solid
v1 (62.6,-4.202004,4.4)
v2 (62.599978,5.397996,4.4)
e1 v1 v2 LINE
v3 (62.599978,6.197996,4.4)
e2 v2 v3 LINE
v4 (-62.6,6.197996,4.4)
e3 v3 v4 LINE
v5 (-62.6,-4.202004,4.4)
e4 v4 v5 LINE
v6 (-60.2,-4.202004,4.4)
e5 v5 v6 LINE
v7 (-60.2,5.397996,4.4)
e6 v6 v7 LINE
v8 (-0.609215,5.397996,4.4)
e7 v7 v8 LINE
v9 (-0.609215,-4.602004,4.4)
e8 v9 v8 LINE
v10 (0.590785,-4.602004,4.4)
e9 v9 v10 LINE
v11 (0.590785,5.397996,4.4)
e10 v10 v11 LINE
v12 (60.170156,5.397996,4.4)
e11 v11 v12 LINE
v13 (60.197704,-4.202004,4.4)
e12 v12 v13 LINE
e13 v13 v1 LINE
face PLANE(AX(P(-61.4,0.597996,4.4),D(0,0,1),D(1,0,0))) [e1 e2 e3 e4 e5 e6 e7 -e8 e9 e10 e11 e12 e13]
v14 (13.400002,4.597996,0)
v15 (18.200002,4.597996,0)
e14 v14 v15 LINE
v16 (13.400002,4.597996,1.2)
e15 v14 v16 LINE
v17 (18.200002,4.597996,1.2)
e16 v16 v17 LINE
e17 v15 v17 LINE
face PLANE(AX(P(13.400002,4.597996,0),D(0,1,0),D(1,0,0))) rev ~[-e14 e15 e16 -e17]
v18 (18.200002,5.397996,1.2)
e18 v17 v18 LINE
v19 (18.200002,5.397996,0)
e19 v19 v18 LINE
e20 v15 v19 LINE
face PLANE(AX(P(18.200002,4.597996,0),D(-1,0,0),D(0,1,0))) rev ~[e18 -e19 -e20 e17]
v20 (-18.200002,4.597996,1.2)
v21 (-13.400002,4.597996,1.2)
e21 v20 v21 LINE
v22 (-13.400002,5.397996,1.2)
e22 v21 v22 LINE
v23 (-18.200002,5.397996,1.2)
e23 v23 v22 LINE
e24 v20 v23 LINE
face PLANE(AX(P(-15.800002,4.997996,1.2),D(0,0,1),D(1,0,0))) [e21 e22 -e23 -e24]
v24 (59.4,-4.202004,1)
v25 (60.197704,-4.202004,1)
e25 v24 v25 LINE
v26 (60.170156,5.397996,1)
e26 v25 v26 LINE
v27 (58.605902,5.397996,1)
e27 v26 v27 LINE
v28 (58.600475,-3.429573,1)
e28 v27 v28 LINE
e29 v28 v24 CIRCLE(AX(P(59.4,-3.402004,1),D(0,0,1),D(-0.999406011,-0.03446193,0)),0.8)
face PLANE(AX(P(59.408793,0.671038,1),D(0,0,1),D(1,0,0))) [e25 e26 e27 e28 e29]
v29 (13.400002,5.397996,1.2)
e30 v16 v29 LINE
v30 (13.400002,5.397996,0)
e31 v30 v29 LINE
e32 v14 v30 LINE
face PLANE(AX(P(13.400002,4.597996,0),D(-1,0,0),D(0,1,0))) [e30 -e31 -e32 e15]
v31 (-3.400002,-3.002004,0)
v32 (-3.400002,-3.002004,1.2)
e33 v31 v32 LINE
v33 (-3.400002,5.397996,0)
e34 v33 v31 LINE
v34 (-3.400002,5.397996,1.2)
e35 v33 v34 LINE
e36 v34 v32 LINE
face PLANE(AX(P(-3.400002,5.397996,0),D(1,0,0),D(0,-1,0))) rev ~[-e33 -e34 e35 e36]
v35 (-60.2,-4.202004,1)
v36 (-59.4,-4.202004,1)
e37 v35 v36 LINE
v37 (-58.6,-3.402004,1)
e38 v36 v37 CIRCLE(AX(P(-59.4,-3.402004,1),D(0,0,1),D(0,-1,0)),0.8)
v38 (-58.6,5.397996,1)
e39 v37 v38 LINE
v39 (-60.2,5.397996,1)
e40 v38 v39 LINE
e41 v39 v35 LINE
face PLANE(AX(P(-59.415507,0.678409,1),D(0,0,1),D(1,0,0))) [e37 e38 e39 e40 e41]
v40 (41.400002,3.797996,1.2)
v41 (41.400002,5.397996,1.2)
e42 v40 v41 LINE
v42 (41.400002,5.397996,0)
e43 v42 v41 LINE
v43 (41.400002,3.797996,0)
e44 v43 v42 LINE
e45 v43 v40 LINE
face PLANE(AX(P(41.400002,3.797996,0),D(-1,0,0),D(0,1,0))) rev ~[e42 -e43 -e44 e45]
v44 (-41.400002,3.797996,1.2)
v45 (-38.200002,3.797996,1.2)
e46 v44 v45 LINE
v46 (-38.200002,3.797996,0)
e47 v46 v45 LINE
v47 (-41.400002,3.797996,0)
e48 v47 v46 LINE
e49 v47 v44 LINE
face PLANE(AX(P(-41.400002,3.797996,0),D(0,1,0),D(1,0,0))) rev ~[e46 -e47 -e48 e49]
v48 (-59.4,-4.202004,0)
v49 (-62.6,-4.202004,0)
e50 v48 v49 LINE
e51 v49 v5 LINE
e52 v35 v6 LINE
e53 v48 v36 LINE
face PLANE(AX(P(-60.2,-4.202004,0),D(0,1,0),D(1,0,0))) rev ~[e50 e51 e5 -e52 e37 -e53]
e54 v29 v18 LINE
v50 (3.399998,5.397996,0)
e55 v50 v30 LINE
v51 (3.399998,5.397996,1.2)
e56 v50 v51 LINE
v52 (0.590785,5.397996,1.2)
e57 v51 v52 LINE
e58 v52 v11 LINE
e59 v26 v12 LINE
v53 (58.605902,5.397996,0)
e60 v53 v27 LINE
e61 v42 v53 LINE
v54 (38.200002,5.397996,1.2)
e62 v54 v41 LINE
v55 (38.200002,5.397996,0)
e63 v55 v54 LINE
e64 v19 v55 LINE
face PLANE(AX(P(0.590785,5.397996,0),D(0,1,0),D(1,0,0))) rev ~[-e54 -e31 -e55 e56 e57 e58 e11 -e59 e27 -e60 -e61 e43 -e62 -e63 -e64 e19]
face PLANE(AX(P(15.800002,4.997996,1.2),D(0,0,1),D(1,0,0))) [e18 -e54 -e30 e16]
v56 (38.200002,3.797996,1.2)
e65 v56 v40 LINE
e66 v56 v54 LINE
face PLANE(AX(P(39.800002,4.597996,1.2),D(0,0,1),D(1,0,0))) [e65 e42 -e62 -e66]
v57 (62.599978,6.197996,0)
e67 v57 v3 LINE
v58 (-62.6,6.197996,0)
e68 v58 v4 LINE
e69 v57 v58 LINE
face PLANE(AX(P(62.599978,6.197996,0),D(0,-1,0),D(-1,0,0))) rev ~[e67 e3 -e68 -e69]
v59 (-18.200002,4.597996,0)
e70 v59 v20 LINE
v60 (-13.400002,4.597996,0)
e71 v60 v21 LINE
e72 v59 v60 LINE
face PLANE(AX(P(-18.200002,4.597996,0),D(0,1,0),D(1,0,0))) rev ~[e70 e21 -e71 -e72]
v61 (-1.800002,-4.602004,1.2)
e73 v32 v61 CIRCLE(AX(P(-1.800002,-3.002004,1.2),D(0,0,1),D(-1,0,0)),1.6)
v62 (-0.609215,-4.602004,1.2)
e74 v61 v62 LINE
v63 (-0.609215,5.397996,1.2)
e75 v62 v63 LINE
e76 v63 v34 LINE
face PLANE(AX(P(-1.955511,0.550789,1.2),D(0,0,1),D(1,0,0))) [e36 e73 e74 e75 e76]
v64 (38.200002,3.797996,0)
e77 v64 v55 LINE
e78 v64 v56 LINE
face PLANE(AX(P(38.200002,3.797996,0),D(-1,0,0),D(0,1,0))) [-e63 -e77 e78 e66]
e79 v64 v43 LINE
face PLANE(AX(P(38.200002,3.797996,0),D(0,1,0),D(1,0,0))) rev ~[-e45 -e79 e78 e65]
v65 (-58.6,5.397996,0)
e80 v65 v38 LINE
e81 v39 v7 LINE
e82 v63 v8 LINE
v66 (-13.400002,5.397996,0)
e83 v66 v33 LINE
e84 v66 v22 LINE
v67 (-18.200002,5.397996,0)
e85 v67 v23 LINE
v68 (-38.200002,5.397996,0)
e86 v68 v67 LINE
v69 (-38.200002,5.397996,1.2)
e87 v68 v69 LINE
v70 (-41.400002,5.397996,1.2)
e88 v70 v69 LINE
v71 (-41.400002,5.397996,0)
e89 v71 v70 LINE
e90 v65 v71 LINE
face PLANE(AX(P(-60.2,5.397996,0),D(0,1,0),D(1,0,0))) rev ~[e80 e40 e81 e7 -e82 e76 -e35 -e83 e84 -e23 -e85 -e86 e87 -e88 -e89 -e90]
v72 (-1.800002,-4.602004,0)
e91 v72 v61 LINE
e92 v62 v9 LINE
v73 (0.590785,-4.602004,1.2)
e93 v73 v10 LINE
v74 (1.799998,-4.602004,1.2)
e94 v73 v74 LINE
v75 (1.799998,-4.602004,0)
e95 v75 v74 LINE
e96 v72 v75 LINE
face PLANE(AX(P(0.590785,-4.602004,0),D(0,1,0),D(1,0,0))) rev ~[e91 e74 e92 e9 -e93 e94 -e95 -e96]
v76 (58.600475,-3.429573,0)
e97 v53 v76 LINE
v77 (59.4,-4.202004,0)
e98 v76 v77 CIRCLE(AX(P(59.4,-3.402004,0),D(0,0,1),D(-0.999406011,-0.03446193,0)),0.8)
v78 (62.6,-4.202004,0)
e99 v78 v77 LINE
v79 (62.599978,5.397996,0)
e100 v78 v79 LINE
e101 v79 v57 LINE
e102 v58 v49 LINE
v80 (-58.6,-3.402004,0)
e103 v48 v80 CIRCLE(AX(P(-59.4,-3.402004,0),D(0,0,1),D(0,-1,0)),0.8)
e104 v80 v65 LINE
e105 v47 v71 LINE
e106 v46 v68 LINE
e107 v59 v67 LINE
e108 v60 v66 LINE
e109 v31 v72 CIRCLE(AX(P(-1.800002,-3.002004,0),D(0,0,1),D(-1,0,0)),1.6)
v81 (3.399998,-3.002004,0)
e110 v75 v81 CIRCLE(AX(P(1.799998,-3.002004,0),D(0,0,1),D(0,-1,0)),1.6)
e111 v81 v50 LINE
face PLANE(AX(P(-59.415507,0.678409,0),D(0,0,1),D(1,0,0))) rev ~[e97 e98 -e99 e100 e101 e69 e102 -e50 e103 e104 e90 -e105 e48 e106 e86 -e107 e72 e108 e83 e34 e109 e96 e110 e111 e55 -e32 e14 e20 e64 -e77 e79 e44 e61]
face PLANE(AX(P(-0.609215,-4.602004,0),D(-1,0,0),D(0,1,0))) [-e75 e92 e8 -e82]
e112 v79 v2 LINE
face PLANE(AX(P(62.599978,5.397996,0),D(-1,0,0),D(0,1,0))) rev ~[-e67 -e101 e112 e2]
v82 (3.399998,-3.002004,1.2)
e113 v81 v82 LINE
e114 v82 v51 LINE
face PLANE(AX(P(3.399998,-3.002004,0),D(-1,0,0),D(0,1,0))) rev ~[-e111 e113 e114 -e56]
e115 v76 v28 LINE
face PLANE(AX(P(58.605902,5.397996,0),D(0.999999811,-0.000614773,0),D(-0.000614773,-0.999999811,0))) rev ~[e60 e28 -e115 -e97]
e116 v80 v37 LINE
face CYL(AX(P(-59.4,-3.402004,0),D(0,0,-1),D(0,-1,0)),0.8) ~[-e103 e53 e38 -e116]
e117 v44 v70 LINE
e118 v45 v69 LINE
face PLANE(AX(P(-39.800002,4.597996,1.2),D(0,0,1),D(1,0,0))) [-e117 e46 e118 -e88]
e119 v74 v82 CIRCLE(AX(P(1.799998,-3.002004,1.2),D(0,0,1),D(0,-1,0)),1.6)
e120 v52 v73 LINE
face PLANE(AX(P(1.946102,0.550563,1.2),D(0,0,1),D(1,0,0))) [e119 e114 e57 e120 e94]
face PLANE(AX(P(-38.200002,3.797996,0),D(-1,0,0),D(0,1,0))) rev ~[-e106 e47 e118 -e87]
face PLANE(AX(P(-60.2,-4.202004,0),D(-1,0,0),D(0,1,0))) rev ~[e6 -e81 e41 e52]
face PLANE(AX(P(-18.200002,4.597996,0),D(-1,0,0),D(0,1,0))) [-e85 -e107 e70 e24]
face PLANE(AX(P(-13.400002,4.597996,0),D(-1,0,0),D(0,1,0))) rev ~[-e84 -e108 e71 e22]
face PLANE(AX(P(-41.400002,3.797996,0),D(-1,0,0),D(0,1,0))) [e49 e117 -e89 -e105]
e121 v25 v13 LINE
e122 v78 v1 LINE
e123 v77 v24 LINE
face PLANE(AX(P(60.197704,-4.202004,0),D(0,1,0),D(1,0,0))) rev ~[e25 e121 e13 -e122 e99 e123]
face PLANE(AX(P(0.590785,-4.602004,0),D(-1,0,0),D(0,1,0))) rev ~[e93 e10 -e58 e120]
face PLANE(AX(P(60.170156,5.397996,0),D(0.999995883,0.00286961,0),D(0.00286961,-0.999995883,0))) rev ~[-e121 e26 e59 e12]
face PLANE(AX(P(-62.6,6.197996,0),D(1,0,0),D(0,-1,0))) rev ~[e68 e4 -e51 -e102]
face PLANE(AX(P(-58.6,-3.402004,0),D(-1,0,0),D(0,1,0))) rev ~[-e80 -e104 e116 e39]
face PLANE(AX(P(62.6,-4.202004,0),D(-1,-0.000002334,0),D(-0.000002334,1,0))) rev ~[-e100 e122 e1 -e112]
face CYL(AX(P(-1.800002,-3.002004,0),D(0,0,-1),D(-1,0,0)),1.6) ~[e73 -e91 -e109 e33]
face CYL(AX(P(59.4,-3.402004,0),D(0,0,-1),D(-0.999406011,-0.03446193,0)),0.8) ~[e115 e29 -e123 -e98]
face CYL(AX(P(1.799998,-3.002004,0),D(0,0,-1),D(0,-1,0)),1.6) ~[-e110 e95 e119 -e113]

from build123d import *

# Parameters (mm, degrees)
F0_W     = 2.4
F0_H     = 9.6
F0_H_2   = 0.8
F0_W_2   = 1.2
F0_H_3   = 10
F0_W_3   = 1.6
F1_DEPTH = 4.4
F0_W_4   = 3.2
F0_H_4   = 1.6
F0_W_5   = 4.8
F2_DEPTH = 1.2
F3_DEPTH = 1


# Not quite as in the source:
# - ends of sketch curves that miss each other by under 0.0002 mm in the source are joined


with BuildPart() as f1:
    # F0 (on Top) → F1 (new body)
    with BuildSketch(Plane.XY):
        with Locations((-61.4, 0.5979961667)):
            Rectangle(F0_W, F0_H)
        with Locations((-61.4, 5.7979961667)):
            Rectangle(F0_W, F0_H_2)
        Polygon((-58.6, 5.3979961667), (-41.4000016928, 5.3979961667), (-38.2000016928, 5.3979961667), (-18.2000016928, 5.3979961667), (-13.4000016928, 5.3979961667), (-3.4000016928, 5.3979961667), (-0.6092149836, 5.3979961667), (0.5907850164, 5.3979961667), (3.3999983072, 5.3979961667), (13.4000016928, 5.3979961667), (18.2000016928, 5.3979961667), (38.2000016928, 5.3979961667), (41.4000016928, 5.3979961667), (58.6059018172, 5.3979961667), (58.6063936353, 6.1979961667), (-58.6, 6.1979961667), align=None)
        Polygon((62.5999775911, 6.1979961667), (60.1678602397, 6.1979961667), (60.1701559369, 5.3979961667), (62.5999775911, 5.3979961667), (62.5999775911, 5.7979961667), align=None)
        Polygon((62.5999775911, 5.3979961667), (60.1701559369, 5.3979961667), (60.1977043028, -4.2020038333), (62.6, -4.2020038333), align=None)
        with Locations((-0.0092149836, 0.3979961667)):
            Rectangle(F0_W_2, F0_H_3)
        with Locations((-59.4, 5.7979961667)):
            Rectangle(F0_W_3, F0_H_2)
        Polygon((60.1678602397, 6.1979961667), (58.6063936353, 6.1979961667), (58.6059018172, 5.3979961667), (60.1701559369, 5.3979961667), align=None)
    extrude(amount=F1_DEPTH)

    # F0 (on Top) → F2 (join)
    with BuildSketch(Plane.XY):
        with Locations((39.8000016928, 4.5979961667)):
            Rectangle(F0_W_4, F0_H_4)
        with Locations((15.8000016928, 4.9979961667)):
            Rectangle(F0_W_5, F0_H_2)
        with BuildLine():
            Line((3.3999983072, 5.3979961667), (0.5907850164, 5.3979961667))
            Line((0.5907850164, 5.3979961667), (0.5907850164, -4.6020038333))
            Line((0.5907850164, -4.6020038333), (1.7999983072, -4.6020038333))
            ThreePointArc((1.7999983072, -4.6020038333), (2.9313691571, -4.1333746832), (3.3999983072, -3.0020038333))
            Line((3.3999983072, -3.0020038333), (3.3999983072, 5.3979961667))
        make_face()
        with BuildLine():
            Line((-0.6092149836, 5.3979961667), (-3.4000016928, 5.3979961667))
            Line((-3.4000016928, 5.3979961667), (-3.4000016928, -3.0020038333))
            ThreePointArc((-3.4000016928, -3.0020038333), (-2.9313725427, -4.1333746832), (-1.8000016928, -4.6020038333))
            Line((-1.8000016928, -4.6020038333), (-0.6092149836, -4.6020038333))
            Line((-0.6092149836, -4.6020038333), (-0.6092149836, 5.3979961667))
        make_face()
        with Locations((-15.8000016928, 4.9979961667)):
            Rectangle(F0_W_5, F0_H_2)
        with Locations((-39.8000016928, 4.5979961667)):
            Rectangle(F0_W_4, F0_H_4)
    extrude(amount=F2_DEPTH)

    # F0 (on Top) → F3 (join)
    with BuildSketch(Plane.XY):
        with BuildLine():
            Line((-58.6, -3.4020038333), (-58.6, 5.3979961667))
            Line((-58.6, 5.3979961667), (-60.2, 5.3979961667))
            Line((-60.2, 5.3979961667), (-60.2, -4.2020038333))
            Line((-60.2, -4.2020038333), (-59.4, -4.2020038333))
            ThreePointArc((-59.4, -4.2020038333), (-58.8343145751, -3.9676892582), (-58.6, -3.4020038333))
        make_face()
        with BuildLine():
            Line((60.1701559369, 5.3979961667), (58.6059018172, 5.3979961667))
            Line((58.6059018172, 5.3979961667), (58.6004748691, -3.4295733769))
            ThreePointArc((58.6004748691, -3.4295733769), (58.8441470155, -3.9773540027), (59.3999996781, -4.2020038333))
            Line((59.3999996781, -4.2020038333), (60.1977043028, -4.2020038333))
            Line((60.1977043028, -4.2020038333), (60.1701559369, 5.3979961667))
        make_face()
    extrude(amount=F3_DEPTH)


solid = f1.part
